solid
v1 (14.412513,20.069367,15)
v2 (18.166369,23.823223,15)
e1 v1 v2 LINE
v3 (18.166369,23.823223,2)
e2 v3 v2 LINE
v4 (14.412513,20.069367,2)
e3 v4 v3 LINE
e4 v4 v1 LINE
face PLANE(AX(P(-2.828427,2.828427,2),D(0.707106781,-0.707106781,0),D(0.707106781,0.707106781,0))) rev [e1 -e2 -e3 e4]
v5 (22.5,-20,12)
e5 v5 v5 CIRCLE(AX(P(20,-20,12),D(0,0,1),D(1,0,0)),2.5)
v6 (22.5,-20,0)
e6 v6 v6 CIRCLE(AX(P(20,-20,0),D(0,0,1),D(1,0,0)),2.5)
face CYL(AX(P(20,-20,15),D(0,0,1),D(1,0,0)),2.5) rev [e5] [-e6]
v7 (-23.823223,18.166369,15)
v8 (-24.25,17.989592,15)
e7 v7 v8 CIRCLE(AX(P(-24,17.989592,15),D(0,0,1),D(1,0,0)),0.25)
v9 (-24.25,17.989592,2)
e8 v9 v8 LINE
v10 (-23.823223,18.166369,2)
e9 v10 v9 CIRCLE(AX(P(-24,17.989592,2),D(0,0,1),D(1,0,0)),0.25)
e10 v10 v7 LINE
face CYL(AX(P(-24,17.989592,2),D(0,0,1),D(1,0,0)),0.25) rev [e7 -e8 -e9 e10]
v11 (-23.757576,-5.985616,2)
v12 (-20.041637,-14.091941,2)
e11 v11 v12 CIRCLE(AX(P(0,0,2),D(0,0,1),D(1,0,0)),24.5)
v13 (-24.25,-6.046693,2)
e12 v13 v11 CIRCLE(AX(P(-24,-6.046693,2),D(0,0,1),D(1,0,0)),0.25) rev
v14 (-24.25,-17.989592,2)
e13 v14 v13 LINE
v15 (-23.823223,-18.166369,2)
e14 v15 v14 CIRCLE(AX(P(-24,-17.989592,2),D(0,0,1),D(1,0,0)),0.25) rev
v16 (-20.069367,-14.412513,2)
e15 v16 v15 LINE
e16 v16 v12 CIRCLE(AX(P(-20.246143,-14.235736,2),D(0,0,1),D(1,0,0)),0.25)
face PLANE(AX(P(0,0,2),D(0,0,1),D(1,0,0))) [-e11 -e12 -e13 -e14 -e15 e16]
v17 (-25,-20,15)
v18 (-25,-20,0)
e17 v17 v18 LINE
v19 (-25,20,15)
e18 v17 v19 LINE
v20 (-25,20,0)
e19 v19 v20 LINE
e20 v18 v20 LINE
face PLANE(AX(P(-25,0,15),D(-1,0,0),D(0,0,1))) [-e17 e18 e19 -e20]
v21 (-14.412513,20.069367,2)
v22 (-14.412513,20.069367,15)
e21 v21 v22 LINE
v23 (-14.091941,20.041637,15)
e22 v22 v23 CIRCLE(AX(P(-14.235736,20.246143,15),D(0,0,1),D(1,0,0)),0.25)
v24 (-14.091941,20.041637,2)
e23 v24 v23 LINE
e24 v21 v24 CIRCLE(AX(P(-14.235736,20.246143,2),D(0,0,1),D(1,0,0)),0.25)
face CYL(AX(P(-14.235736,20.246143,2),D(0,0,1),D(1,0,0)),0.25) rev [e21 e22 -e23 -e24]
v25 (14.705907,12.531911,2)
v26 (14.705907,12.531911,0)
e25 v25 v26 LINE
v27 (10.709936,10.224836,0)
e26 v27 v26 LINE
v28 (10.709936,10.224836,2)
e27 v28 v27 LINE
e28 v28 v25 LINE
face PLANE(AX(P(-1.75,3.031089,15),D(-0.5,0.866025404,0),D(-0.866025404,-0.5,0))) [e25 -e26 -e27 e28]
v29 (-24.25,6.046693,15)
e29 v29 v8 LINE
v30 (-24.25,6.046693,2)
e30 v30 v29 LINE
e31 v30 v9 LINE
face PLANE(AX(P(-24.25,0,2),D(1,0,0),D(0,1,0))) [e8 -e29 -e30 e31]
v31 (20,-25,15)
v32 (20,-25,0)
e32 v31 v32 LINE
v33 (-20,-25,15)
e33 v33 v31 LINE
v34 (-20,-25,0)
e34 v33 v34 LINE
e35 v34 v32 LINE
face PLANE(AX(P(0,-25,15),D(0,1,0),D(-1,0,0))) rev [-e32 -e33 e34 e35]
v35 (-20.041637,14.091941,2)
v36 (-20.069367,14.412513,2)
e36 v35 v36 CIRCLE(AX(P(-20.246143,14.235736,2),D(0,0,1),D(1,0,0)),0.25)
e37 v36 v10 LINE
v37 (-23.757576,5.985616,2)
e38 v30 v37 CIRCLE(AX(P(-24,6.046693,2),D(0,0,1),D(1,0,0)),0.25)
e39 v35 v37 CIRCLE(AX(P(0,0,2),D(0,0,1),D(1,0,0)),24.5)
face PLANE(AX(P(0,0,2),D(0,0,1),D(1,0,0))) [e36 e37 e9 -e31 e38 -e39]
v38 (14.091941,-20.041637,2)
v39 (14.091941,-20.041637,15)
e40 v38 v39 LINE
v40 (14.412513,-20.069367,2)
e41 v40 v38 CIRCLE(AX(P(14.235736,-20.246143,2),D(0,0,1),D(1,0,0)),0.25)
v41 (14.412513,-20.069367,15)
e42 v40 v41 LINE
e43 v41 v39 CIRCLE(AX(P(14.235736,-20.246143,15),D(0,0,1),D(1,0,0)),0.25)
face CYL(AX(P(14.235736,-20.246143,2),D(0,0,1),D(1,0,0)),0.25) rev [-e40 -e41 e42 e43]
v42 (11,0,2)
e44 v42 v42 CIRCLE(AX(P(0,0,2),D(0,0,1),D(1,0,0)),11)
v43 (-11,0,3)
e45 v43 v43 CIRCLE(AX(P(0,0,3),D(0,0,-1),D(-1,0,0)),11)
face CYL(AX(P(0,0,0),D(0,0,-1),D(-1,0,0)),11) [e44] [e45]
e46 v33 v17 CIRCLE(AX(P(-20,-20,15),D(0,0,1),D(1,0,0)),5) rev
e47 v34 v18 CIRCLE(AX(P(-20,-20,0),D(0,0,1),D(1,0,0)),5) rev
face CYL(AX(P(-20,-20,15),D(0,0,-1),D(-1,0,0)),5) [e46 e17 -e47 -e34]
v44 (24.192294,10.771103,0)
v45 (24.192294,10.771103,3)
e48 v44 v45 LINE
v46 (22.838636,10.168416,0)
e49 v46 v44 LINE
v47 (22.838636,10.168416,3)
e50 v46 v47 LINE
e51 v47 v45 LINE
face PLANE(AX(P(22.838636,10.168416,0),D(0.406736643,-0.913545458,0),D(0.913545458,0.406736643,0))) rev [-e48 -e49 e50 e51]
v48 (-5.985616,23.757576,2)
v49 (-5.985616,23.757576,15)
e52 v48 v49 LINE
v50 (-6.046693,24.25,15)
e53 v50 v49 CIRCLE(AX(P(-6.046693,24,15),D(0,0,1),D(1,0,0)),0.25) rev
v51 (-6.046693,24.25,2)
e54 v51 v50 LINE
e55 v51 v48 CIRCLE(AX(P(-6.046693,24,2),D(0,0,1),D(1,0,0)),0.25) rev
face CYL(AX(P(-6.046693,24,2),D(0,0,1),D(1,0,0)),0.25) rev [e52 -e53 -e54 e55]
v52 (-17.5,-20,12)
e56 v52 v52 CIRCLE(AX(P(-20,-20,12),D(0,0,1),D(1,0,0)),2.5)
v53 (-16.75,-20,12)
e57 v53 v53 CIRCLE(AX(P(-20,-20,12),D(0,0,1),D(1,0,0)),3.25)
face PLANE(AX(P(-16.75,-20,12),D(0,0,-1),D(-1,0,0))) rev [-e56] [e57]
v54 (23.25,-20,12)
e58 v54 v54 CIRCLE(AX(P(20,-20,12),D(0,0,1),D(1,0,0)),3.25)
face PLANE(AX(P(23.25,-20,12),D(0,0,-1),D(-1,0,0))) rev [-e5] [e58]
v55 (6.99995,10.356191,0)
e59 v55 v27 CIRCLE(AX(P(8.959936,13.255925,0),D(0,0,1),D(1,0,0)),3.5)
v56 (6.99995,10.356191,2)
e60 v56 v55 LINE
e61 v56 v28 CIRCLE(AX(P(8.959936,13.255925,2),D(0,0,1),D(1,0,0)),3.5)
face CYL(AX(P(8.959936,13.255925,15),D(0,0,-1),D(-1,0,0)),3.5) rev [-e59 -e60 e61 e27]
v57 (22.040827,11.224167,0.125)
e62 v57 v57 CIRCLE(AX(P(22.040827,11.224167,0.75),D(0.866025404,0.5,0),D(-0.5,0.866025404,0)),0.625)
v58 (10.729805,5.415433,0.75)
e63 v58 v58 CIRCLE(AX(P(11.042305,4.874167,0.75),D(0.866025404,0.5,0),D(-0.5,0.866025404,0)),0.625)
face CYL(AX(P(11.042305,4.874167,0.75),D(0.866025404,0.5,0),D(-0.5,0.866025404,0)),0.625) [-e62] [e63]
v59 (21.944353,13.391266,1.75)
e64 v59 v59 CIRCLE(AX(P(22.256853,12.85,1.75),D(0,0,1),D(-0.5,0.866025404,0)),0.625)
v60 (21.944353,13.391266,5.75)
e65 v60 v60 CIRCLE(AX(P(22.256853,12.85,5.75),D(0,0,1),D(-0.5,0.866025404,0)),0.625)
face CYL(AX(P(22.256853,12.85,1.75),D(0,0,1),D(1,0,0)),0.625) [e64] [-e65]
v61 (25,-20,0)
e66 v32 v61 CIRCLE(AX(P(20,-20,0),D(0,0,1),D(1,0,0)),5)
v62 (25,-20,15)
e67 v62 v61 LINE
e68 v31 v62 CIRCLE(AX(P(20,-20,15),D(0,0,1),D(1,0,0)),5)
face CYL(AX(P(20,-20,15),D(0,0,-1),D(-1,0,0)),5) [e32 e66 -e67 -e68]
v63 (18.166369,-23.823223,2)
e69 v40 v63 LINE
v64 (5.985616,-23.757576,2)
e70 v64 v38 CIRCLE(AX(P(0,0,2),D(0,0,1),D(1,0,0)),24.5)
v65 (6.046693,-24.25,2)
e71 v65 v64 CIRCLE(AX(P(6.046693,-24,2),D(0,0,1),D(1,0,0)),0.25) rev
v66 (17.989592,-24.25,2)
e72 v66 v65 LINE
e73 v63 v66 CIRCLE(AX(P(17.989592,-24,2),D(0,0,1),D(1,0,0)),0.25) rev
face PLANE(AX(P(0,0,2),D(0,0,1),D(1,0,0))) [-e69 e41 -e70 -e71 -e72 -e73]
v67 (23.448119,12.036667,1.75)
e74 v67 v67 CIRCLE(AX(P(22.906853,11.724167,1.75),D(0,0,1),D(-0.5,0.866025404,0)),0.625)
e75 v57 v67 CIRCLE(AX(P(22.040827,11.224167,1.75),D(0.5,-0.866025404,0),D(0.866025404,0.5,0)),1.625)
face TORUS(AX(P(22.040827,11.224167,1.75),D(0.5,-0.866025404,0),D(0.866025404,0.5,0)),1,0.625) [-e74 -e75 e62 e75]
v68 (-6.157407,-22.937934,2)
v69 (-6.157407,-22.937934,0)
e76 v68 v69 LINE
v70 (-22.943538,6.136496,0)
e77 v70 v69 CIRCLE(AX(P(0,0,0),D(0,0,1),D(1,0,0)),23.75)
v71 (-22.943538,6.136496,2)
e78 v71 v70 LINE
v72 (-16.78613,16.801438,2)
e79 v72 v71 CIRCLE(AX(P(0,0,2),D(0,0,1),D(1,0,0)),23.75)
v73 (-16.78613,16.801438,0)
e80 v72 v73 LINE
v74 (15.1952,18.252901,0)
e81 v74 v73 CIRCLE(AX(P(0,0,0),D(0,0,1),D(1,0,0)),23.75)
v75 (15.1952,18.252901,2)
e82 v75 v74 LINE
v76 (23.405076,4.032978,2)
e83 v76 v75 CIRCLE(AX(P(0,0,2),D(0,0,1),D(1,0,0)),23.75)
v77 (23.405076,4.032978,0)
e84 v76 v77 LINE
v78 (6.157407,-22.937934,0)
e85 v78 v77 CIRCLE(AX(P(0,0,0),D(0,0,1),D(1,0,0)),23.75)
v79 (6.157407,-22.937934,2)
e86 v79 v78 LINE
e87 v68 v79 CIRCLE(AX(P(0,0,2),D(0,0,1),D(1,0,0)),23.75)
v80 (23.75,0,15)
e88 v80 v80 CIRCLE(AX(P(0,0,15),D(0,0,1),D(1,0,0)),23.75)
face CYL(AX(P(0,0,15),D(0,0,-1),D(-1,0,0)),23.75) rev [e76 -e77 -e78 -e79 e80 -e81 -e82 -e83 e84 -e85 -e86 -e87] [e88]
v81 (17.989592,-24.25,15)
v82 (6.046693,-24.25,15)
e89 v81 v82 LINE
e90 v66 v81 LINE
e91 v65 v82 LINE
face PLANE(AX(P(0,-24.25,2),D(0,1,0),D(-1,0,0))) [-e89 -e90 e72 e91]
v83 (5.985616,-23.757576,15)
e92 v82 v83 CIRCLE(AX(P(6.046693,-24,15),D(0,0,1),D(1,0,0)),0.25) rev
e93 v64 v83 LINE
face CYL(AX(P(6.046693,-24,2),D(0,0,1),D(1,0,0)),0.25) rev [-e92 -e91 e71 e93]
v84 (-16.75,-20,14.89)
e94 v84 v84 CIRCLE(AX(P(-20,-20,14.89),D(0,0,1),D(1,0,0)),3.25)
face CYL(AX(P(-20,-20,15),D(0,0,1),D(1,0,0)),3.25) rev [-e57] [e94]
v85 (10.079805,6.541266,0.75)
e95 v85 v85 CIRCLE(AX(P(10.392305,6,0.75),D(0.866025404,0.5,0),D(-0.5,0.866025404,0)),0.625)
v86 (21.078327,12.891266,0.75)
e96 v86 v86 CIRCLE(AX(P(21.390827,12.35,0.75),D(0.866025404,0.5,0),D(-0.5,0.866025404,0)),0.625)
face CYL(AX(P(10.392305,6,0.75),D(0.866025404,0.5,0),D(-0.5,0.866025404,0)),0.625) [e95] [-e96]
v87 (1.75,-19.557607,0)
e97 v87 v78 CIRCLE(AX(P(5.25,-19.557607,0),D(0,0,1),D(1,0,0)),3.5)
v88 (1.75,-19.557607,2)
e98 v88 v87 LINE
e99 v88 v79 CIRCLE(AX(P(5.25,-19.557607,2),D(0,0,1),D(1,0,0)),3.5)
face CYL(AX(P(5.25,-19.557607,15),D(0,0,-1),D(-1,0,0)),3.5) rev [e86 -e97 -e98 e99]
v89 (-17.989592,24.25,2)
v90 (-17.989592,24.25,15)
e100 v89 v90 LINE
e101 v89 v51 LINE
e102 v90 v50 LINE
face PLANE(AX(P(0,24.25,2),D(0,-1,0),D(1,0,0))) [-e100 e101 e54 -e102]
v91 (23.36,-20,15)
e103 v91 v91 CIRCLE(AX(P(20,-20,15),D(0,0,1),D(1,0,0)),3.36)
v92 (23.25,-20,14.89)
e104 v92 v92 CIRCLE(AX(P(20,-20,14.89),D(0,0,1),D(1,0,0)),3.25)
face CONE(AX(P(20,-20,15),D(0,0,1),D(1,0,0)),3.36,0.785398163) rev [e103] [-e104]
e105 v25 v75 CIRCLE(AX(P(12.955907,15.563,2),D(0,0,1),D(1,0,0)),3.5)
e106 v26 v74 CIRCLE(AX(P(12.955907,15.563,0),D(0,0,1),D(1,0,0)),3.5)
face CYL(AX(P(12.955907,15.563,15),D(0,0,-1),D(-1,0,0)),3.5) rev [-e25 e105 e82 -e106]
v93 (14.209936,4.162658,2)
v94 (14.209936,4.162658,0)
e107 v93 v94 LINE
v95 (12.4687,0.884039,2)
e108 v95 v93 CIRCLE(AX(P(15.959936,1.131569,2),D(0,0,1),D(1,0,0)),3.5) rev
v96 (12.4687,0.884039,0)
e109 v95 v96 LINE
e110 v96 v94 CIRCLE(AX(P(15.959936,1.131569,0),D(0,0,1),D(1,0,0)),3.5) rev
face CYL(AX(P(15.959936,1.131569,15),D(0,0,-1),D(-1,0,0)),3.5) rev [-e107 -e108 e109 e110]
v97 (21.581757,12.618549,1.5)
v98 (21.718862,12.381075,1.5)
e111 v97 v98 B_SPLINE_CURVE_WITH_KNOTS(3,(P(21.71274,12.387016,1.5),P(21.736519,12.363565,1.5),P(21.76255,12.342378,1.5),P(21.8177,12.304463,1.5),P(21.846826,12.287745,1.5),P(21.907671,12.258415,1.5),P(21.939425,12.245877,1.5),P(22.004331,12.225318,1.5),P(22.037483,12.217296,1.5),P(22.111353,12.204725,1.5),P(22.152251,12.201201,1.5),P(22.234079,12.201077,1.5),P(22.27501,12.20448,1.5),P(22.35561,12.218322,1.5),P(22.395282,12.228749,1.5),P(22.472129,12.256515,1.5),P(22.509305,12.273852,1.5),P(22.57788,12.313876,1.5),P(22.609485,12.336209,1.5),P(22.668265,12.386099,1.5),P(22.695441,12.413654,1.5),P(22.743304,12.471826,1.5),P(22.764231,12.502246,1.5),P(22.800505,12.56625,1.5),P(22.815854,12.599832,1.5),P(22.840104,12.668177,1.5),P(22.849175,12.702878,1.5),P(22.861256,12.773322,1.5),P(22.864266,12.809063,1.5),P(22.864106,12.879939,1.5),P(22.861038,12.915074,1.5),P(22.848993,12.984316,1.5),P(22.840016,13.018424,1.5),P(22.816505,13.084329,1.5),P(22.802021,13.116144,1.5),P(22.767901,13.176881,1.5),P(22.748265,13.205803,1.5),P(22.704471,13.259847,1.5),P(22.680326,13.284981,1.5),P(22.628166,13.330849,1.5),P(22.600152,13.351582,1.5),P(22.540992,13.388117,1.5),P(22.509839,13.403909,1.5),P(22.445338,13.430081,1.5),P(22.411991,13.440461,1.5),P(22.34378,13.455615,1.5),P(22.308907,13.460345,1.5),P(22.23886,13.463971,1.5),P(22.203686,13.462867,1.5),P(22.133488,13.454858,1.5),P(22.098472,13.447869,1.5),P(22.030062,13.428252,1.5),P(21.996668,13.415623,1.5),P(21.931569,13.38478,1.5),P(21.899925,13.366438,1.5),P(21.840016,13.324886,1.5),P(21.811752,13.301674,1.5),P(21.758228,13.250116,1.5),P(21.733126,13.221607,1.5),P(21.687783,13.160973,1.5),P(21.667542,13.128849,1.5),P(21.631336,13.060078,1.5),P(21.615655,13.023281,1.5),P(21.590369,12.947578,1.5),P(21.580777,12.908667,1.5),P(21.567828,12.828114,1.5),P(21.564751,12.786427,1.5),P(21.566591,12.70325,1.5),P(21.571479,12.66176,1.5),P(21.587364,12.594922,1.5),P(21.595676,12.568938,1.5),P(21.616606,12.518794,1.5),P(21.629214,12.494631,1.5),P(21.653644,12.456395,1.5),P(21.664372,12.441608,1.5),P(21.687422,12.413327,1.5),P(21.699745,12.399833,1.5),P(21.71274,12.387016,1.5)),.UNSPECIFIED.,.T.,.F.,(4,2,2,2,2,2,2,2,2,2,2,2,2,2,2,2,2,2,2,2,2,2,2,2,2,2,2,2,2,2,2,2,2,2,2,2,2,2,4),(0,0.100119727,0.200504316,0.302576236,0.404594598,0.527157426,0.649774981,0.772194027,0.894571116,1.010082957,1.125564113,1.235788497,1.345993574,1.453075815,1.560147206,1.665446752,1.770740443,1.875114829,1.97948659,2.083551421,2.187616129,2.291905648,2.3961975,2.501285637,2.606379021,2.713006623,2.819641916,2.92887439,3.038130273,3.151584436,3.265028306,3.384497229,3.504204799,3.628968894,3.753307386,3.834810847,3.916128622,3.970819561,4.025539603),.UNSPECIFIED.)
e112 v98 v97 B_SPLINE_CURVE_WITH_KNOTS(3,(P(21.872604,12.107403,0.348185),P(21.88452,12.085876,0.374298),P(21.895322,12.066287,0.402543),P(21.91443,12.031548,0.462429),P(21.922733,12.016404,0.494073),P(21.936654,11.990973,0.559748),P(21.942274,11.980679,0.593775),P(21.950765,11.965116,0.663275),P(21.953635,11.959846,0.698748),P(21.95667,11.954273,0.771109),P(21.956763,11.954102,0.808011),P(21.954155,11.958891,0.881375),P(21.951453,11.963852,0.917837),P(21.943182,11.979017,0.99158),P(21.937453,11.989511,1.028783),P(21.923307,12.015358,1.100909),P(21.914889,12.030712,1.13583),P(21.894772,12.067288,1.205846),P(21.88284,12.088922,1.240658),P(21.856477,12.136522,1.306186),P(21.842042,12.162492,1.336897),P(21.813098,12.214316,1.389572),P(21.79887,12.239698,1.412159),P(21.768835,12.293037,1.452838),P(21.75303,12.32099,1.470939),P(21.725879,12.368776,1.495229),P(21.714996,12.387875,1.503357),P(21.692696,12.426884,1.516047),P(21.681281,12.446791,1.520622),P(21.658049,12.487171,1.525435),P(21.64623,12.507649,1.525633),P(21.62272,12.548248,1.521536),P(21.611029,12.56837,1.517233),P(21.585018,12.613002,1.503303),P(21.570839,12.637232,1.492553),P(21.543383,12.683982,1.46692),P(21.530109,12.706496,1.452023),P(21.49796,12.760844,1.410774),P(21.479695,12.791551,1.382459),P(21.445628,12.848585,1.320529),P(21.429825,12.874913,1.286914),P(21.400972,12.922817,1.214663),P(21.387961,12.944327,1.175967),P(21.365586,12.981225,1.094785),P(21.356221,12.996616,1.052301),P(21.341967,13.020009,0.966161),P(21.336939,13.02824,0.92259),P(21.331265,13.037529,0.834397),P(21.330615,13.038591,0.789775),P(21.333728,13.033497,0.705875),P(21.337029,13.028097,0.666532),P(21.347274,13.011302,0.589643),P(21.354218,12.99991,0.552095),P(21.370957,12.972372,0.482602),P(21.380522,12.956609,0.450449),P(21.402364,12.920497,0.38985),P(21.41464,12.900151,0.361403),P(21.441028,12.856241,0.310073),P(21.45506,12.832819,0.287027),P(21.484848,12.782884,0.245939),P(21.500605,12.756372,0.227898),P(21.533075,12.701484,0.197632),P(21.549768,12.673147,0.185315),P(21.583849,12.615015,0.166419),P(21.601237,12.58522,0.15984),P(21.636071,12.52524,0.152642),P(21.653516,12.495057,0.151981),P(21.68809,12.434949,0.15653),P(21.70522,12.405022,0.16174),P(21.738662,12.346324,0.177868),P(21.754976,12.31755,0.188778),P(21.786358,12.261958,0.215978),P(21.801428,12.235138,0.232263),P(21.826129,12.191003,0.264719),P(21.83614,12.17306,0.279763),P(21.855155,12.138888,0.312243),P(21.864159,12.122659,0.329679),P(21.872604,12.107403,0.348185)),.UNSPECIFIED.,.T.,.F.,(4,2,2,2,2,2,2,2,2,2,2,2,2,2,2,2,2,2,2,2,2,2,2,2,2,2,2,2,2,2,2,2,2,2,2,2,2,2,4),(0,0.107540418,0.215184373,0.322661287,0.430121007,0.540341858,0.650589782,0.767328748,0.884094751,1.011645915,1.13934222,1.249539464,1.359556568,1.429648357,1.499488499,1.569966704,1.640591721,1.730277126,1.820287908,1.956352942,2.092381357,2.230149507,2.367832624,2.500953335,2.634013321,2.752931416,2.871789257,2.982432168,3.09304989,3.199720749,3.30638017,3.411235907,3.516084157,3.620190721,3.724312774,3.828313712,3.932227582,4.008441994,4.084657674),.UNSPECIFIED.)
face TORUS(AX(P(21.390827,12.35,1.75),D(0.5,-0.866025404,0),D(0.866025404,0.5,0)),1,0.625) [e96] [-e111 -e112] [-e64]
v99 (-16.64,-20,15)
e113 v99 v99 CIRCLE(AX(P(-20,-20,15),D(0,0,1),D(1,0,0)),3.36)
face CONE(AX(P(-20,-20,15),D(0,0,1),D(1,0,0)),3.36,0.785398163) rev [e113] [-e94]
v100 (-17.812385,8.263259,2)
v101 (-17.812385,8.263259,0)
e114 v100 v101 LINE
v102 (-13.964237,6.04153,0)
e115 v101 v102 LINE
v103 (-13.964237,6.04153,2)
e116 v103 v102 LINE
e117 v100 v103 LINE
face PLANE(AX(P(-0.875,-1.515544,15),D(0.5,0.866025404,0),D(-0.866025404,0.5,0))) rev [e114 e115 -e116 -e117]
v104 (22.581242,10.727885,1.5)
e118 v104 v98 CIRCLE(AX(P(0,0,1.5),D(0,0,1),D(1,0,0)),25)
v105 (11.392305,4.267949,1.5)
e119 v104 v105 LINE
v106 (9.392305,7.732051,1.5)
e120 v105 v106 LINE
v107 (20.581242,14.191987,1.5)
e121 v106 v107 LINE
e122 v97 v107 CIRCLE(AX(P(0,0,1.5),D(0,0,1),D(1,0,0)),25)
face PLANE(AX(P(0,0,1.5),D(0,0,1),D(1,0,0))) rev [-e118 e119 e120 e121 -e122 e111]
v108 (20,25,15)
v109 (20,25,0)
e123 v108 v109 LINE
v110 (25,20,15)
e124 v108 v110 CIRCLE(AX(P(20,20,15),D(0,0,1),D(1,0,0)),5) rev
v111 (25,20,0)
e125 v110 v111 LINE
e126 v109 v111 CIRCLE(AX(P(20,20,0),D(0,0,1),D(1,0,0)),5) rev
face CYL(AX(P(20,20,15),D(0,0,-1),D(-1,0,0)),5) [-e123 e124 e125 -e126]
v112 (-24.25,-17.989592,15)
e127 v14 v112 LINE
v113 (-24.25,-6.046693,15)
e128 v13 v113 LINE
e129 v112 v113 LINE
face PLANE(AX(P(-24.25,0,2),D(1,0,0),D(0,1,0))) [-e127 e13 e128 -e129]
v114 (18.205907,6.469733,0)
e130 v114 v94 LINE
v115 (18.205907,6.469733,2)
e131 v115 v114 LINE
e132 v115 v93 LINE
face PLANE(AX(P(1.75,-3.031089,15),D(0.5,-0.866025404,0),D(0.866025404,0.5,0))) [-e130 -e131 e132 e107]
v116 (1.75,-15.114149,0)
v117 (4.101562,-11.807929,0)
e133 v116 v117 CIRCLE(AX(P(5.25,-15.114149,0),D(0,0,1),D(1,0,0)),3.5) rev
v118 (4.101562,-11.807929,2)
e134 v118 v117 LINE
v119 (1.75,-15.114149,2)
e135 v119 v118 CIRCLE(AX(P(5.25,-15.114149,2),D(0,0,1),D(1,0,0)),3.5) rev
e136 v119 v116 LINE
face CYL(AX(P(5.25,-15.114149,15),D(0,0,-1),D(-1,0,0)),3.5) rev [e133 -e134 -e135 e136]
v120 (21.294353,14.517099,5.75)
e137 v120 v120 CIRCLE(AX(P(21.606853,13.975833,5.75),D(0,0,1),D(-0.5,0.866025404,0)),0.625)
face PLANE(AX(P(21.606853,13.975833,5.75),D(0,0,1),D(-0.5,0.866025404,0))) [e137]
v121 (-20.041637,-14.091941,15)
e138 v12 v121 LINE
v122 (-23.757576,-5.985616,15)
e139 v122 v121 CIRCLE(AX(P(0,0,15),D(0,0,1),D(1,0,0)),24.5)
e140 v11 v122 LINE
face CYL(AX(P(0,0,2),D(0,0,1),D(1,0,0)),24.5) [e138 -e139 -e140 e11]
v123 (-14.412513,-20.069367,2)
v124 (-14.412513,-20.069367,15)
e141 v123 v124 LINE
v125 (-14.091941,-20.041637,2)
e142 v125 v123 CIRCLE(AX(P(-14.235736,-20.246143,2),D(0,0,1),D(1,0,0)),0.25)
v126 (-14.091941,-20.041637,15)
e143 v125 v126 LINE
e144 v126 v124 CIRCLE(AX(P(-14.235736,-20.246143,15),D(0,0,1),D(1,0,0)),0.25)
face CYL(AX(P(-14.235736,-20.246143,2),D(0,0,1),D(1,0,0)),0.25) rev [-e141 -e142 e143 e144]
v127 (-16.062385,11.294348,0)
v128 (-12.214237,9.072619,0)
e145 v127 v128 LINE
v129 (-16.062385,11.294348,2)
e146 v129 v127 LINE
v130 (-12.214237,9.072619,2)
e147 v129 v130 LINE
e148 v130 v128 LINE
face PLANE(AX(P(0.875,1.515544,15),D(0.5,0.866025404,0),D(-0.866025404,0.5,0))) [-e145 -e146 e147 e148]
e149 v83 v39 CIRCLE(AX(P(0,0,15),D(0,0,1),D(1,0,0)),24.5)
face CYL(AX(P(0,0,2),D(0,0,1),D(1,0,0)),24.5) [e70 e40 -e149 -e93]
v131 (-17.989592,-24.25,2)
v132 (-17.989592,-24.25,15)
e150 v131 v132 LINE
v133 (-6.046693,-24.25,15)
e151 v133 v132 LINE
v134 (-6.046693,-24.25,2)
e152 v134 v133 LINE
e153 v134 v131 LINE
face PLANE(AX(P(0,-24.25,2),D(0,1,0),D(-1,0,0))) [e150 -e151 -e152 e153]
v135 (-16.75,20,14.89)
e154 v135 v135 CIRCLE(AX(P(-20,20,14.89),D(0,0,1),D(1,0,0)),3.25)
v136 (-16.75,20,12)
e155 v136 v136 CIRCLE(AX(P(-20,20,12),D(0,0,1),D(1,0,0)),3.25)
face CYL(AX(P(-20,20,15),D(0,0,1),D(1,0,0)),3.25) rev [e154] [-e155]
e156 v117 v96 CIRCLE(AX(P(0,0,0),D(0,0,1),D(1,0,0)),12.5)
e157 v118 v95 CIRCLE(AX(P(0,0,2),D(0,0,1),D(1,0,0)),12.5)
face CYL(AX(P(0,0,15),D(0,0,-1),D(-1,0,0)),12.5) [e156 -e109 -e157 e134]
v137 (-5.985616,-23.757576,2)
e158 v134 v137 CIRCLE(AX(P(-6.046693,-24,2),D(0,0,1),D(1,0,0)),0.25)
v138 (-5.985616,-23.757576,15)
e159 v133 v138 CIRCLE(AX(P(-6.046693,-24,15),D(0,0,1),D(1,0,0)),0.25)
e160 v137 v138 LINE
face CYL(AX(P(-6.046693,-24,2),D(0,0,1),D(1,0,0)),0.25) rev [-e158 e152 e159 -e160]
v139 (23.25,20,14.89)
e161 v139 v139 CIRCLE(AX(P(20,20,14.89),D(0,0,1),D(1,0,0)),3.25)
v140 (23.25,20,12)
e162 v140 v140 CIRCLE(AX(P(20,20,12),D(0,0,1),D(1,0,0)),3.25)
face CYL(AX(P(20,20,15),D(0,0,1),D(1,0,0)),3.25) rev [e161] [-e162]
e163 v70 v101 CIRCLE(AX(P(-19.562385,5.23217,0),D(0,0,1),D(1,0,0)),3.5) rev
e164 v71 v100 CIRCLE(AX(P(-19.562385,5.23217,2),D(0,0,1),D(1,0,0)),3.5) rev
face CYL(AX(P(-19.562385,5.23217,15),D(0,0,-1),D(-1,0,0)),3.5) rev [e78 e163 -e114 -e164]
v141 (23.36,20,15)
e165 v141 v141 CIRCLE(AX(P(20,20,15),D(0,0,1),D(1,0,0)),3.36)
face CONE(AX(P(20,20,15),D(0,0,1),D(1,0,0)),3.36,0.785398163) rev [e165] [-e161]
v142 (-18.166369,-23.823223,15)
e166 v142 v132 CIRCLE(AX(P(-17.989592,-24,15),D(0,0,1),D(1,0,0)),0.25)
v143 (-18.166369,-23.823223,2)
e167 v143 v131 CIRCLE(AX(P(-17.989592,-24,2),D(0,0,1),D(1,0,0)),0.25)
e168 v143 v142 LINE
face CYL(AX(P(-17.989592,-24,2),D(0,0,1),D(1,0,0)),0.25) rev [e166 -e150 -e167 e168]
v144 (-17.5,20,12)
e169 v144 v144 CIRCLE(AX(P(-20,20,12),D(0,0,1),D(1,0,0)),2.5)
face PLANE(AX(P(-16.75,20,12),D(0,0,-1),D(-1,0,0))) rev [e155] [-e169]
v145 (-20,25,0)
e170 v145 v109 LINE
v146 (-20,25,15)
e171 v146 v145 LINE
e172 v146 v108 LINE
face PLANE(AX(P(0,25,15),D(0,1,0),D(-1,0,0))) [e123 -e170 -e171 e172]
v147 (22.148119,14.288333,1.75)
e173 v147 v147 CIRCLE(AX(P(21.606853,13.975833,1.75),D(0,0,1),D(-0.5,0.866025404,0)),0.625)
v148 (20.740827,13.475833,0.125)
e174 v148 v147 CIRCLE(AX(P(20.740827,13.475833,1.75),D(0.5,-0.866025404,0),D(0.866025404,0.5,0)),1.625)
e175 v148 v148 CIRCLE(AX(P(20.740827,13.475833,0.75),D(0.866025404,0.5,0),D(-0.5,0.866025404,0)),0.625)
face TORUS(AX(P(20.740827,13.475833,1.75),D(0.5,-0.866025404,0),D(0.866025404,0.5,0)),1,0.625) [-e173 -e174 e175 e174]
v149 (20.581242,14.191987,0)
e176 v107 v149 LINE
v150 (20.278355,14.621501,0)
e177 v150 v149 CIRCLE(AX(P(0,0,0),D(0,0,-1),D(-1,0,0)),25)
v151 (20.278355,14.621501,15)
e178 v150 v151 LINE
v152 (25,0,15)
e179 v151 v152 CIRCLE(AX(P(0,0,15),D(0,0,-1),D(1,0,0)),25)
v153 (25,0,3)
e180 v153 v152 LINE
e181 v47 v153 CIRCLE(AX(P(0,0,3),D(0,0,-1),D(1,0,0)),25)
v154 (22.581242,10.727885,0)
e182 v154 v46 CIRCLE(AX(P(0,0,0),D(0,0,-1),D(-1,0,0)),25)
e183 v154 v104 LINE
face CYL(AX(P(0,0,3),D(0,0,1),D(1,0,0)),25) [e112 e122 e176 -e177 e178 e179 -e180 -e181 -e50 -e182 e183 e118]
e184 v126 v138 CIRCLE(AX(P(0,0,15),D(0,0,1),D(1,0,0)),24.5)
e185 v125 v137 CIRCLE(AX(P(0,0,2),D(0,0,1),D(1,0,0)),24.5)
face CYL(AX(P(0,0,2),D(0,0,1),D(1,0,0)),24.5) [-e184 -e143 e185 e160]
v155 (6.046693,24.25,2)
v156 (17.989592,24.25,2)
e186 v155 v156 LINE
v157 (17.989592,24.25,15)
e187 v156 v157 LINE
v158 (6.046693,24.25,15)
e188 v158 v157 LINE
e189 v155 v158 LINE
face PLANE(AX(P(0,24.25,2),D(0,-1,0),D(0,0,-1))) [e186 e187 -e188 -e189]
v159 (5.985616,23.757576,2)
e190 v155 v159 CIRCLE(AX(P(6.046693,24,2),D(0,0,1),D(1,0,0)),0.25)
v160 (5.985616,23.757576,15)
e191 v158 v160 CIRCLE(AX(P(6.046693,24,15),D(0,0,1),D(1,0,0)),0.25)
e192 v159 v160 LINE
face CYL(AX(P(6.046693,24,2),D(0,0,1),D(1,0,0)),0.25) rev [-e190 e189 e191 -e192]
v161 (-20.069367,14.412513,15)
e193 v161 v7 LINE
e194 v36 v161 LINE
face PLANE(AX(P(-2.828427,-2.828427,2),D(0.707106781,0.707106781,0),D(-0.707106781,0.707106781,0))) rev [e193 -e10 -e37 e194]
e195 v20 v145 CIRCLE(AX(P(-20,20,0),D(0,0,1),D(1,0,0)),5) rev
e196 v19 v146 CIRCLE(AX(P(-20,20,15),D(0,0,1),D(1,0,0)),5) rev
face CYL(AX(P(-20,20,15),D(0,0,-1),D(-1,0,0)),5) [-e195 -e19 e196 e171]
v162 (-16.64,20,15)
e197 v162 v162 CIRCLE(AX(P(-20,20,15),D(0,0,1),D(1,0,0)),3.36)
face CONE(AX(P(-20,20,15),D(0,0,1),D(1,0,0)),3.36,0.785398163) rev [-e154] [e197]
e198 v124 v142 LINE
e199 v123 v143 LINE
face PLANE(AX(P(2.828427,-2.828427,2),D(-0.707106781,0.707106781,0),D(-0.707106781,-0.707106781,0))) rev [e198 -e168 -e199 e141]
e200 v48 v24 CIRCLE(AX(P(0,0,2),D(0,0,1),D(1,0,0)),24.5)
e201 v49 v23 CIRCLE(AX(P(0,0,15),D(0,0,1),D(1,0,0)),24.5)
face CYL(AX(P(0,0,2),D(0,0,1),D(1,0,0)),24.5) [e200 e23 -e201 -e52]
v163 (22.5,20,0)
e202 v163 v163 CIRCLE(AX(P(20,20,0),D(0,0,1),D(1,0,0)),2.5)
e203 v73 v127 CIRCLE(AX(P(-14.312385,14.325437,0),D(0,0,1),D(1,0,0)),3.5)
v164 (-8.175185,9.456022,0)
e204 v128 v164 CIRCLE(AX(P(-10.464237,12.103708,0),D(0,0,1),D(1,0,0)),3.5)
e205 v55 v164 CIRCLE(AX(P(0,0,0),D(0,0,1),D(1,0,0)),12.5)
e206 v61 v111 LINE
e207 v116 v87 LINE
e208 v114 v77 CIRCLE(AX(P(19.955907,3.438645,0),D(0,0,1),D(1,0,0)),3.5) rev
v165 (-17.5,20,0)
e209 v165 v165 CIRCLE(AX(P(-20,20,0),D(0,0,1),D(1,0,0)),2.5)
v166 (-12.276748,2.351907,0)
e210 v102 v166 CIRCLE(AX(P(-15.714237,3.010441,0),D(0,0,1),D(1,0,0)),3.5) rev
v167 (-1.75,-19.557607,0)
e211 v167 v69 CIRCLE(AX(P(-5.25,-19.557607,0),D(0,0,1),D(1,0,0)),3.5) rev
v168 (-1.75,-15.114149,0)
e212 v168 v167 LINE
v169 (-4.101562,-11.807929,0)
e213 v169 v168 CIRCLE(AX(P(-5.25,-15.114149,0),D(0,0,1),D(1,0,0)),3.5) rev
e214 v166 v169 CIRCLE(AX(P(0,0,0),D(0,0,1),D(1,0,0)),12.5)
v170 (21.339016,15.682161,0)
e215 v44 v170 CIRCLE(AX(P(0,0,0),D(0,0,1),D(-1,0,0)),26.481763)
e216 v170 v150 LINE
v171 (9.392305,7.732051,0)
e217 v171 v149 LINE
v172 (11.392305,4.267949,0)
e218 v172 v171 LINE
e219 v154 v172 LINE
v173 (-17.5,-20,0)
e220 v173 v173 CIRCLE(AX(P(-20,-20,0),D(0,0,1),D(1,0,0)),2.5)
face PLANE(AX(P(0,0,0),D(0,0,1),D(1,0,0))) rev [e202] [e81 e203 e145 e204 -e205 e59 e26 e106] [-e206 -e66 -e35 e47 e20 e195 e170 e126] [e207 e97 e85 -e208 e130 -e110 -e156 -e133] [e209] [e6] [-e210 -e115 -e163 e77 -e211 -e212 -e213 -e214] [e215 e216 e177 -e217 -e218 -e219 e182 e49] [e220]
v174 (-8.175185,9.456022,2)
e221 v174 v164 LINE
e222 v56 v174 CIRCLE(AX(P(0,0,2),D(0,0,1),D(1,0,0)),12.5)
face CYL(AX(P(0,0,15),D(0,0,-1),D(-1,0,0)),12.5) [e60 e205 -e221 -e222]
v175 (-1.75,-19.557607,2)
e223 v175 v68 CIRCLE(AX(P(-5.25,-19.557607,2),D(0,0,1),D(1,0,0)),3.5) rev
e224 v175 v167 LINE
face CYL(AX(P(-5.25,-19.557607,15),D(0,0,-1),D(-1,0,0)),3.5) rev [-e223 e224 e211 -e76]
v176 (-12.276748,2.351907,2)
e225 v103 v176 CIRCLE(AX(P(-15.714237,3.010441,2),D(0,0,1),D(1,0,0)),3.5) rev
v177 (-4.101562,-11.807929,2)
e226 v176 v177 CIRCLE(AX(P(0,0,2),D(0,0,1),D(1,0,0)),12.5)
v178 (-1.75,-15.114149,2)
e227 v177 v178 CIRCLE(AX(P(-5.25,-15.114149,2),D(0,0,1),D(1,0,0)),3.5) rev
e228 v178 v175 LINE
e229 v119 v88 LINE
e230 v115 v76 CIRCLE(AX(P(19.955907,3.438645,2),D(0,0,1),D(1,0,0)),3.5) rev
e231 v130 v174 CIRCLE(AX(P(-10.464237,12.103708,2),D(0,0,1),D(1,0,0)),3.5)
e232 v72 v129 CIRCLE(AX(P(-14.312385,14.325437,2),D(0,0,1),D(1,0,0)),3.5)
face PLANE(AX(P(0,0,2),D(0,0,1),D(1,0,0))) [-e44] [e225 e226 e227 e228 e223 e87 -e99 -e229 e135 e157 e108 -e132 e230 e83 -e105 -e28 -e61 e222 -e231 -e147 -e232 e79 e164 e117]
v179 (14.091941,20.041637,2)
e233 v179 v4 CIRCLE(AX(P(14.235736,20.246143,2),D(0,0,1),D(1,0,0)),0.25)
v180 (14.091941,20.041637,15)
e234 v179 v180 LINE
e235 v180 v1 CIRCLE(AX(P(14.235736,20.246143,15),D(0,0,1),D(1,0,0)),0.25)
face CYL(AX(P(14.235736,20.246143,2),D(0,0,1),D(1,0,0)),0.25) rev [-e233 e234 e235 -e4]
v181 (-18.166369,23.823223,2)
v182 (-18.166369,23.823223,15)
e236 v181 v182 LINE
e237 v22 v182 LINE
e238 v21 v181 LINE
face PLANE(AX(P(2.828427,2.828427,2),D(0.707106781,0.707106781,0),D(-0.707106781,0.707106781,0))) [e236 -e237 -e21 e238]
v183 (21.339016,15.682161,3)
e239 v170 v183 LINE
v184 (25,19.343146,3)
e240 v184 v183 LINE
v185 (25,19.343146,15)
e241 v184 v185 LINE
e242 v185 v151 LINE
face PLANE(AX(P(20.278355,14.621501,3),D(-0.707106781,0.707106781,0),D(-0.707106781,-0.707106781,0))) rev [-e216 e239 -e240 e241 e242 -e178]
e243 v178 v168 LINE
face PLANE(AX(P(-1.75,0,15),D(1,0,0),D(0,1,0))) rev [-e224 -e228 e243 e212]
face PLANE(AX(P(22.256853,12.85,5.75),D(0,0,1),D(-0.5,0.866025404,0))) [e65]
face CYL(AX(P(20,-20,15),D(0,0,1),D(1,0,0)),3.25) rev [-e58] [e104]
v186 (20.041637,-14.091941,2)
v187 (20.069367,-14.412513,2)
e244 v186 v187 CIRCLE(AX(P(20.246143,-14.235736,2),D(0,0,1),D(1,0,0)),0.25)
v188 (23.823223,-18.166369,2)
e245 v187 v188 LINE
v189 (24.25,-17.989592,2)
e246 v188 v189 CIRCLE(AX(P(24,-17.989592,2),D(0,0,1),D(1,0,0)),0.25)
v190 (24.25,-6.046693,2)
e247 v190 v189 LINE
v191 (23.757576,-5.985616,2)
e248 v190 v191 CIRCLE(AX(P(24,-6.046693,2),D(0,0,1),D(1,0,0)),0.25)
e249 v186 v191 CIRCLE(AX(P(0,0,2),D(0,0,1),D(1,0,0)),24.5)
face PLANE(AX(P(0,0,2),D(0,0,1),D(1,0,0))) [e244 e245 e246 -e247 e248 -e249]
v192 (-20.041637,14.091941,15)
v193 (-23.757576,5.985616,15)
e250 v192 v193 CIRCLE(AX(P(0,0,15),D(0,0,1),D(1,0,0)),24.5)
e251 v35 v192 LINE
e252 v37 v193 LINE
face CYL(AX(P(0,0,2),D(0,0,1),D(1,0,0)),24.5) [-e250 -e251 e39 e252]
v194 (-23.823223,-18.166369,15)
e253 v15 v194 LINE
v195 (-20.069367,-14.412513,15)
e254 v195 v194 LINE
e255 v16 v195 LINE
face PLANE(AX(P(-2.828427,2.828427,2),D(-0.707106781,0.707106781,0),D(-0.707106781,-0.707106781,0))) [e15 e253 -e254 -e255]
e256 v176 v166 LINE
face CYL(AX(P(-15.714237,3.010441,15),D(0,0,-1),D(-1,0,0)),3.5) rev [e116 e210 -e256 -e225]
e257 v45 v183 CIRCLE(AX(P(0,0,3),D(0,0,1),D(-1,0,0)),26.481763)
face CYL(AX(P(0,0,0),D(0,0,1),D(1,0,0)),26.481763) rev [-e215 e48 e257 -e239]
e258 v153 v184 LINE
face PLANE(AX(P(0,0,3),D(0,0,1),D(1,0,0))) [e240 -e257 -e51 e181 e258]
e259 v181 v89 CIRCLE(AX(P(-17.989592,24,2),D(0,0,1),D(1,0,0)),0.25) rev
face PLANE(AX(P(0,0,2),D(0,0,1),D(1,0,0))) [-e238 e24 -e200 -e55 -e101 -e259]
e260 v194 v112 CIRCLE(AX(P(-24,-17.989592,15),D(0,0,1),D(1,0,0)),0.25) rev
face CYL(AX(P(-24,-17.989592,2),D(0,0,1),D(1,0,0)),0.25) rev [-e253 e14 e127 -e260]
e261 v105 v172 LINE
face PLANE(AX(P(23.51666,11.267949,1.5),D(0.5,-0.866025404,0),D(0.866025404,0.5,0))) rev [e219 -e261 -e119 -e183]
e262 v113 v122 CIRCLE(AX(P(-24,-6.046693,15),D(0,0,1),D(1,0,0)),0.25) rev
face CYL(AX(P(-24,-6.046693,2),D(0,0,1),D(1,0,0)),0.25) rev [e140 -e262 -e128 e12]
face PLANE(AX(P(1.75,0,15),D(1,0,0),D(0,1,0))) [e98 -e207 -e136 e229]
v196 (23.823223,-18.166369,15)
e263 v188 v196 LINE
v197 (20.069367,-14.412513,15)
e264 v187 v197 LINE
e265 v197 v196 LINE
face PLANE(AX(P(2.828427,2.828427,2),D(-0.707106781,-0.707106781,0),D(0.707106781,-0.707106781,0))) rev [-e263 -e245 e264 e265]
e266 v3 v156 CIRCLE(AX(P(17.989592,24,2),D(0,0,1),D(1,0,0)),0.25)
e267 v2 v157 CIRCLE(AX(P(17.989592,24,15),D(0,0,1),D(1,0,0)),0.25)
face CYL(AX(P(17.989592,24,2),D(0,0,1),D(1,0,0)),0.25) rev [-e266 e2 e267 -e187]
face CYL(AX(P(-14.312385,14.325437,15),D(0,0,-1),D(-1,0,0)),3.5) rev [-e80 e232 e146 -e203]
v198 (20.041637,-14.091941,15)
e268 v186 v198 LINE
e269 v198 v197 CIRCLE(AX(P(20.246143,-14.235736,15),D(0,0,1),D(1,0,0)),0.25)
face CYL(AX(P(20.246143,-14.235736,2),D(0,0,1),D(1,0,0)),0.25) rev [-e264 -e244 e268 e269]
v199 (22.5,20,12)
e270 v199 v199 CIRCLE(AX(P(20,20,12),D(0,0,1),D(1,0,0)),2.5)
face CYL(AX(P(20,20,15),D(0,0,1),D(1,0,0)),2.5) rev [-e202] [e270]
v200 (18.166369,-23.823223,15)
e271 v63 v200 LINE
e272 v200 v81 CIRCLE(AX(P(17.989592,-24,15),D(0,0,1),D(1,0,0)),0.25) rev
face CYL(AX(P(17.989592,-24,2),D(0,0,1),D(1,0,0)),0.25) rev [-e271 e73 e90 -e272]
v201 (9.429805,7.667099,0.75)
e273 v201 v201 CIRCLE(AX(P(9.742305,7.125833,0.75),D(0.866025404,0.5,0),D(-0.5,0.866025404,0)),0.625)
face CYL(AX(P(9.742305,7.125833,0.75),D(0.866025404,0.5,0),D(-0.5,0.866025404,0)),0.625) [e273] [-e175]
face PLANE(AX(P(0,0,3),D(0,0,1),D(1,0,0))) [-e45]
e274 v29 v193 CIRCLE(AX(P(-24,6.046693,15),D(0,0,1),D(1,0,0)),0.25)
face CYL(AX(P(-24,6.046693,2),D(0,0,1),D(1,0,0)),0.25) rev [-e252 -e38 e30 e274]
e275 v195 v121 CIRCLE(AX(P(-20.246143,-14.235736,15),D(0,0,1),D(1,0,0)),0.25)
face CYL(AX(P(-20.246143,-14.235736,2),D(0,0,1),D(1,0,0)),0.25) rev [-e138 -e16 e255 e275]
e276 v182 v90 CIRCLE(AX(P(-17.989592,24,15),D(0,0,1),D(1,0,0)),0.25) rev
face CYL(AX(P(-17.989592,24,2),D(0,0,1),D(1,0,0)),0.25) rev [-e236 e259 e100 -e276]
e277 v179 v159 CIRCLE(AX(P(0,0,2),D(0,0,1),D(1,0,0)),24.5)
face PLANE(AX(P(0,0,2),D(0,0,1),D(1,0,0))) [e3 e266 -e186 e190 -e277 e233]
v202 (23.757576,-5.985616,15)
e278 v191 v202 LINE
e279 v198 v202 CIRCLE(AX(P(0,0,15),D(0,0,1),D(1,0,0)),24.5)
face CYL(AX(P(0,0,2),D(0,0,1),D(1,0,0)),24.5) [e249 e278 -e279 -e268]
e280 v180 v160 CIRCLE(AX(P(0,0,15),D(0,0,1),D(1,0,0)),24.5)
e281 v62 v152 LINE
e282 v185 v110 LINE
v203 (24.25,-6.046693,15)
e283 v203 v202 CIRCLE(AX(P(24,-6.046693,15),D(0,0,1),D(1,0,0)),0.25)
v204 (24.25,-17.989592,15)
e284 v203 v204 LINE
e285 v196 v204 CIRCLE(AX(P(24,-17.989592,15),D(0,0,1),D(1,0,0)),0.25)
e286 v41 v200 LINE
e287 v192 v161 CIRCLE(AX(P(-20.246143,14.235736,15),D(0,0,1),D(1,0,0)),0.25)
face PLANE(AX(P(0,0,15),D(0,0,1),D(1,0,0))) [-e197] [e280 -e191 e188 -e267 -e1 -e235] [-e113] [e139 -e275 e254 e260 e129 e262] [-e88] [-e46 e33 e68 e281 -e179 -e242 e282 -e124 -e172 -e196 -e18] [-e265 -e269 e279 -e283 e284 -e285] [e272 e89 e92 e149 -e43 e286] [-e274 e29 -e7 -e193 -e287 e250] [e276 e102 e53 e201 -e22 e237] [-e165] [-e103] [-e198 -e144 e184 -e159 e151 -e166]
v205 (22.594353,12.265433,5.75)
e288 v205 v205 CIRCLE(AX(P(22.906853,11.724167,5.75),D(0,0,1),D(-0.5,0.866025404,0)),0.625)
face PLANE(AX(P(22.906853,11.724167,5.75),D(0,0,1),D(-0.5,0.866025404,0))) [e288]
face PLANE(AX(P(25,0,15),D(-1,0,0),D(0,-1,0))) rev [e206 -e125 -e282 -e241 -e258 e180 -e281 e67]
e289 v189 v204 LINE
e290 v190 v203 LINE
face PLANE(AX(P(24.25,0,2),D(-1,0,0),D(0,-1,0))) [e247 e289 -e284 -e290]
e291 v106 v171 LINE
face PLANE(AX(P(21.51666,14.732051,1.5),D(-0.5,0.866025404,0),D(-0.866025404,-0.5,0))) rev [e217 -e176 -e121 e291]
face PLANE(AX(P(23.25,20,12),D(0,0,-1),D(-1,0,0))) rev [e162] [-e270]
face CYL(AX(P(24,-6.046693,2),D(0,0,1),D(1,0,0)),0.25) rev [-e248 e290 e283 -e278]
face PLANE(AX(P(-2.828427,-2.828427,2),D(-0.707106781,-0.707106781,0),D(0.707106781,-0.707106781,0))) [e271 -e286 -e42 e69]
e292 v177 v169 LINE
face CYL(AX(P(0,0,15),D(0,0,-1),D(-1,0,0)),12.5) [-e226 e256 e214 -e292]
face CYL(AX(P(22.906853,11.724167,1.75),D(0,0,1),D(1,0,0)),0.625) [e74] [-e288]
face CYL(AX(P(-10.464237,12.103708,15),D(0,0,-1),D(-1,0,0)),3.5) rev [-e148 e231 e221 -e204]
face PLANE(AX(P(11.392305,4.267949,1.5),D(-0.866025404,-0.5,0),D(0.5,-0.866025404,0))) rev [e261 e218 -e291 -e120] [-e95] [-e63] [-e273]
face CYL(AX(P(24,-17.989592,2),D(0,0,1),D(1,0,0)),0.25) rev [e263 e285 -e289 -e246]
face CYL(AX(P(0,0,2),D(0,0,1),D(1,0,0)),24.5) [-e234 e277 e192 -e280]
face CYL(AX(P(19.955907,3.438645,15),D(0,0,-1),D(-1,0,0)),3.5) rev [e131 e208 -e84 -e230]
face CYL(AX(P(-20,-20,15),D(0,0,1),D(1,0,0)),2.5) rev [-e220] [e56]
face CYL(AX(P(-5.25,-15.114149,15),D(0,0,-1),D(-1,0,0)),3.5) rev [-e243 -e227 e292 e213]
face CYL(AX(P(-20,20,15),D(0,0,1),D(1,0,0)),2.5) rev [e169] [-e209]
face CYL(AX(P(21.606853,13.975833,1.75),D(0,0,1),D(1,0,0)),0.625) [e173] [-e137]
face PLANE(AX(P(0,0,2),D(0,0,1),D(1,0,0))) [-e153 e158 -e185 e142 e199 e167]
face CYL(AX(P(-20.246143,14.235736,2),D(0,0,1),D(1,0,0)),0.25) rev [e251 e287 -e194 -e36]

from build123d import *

# Parameters (mm, degrees)
SKETCH_1_R                 = 23.75
SKETCH_1_R_2               = 12.5
EXTRUDE_1_DEPTH            = 15
CUT_EXTRUDE_1_OUTLINE_W    = 23.75
CUT_EXTRUDE_1_OUTLINE_H    = 13
HOLE_WIZARD_M51_AT_2_COUNT = 2
HOLE_WIZARD_M51_AT_2_PITCH = 40
HOLE_WIZARD_M51_AT_3_COUNT = 2
HOLE_WIZARD_M51_AT_3_PITCH = 56.568542495
HOLE_WIZARD_M51_AT_4_COUNT = 2
HOLE_WIZARD_M51_AT_4_PITCH = 40
CUT_EXTRUDE_2_DEPTH        = 13
SKETCH_7_W                 = 1
SKETCH_7_H                 = 11
CUT_EXTRUDE_3_DEPTH        = 12
CUT_EXTRUDE_4_DEPTH        = 38.336309405
CUT_EXTRUDE_5_DEPTH        = 1.5
SKETCH_12_R                = 0.625
PATTERN_LINEAR_1_COUNT     = 3
PATTERN_LINEAR_1_PITCH     = 1.3


# Read off the part's stored shape, not the designer's step: Вырез-Вытянуть1
with BuildPart() as part:
    # Эскиз1 → Бобышка-Вытянуть1 (new body)
    # profile 1 of 17: a face of its own
    with BuildSketch(Plane.XY):
        with BuildLine():
            ThreePointArc((-25, 20), (-23.535533906, 23.535533906), (-20, 25))
            Line((-20, 25), (20, 25))
            ThreePointArc((20, 25), (23.535533906, 23.535533906), (25, 20))
            Line((25, 20), (25, -20))
            ThreePointArc((25, -20), (23.535533906, -23.535533906), (20, -25))
            Line((20, -25), (-20, -25))
            ThreePointArc((-20, -25), (-23.535533906, -23.535533906), (-25, -20))
            Line((-25, -20), (-25, 20))
        make_face()
        Circle(SKETCH_1_R, mode=Mode.SUBTRACT)
    # profile 2 of 17: a face of its own
    with BuildSketch(Plane.XY):
        with BuildLine():
            ThreePointArc((-16.786130187, 16.801438431), (-18.292852528, 15.147080458), (-19.637191497, 13.358263739))
            Line((-19.637191497, 13.358263739), (-16.062384686, 11.294348064))
            ThreePointArc((-16.062384686, 11.294348064), (-17.782545718, 13.869386093), (-16.786130187, 16.801438431))
        make_face()
    # profile 3 of 17: a face of its own
    with BuildSketch(Plane.XY):
        with BuildLine():
            ThreePointArc((-21.387191497, 10.327174826), (-22.264182733, 8.268534768), (-22.943537595, 6.136495958))
            ThreePointArc((-22.943537595, 6.136495958), (-20.90251355, 8.46544329), (-17.812384686, 8.263259151))
            Line((-17.812384686, 8.263259151), (-21.387191497, 10.327174826))
        make_face()
    # profile 4 of 17: a face of its own
    with BuildSketch(Plane.XY):
        with BuildLine():
            Line((-13.964236991, 6.041530043), (-11.593704446, 4.672902441))
            ThreePointArc((-11.593704446, 4.672902441), (-10.825317547, 6.25), (-9.843704446, 7.703991354))
            Line((-9.843704446, 7.703991354), (-12.214236991, 9.072618957))
            Line((-12.214236991, 9.072618957), (-16.062384686, 11.294348064))
            Line((-16.062384686, 11.294348064), (-19.637191497, 13.358263739))
            ThreePointArc((-19.637191497, 13.358263739), (-20.56810334, 11.875), (-21.387191497, 10.327174826))
            Line((-21.387191497, 10.327174826), (-17.812384686, 8.263259151))
            Line((-17.812384686, 8.263259151), (-13.964236991, 6.041530043))
        make_face()
    # profile 5 of 17: a face of its own
    with BuildSketch(Plane.XY):
        with BuildLine():
            Line((14.705906994, 12.531911246), (18.593533985, 14.776433736))
            ThreePointArc((18.593533985, 14.776433736), (16.983553384, 16.60184973), (15.195199561, 18.252901421))
            ThreePointArc((15.195199561, 18.252901421), (16.443176118, 15.264748492), (14.705906994, 12.531911246))
        make_face()
    # profile 6 of 17: a face of its own
    with BuildSketch(Plane.XY):
        with BuildLine():
            ThreePointArc((6.999949839, 10.356191493), (7.849140534, 9.728360236), (8.642304845, 9.031088913))
            Line((8.642304845, 9.031088913), (10.709935794, 10.224836198))
            ThreePointArc((10.709935794, 10.224836198), (8.836092834, 9.758116809), (6.999949839, 10.356191493))
        make_face()
    # profile 7 of 17: a face of its own
    with BuildSketch(Plane.XY):
        with BuildLine():
            Line((-12.214236991, 9.072618957), (-9.843704446, 7.703991354))
            ThreePointArc((-9.843704446, 7.703991354), (-9.051933396, 8.620469929), (-8.175185149, 9.456021773))
            ThreePointArc((-8.175185149, 9.456021773), (-10.133489879, 8.61937058), (-12.214236991, 9.072618957))
        make_face()
    # profile 8 of 17: a face of its own
    with BuildSketch(Plane.XY):
        with BuildLine():
            ThreePointArc((-13.964236991, 6.041530043), (-12.531338827, 4.466174374), (-12.276747649, 2.351907133))
            ThreePointArc((-12.276747649, 2.351907133), (-11.991512649, 3.52896931), (-11.593704446, 4.672902441))
            Line((-11.593704446, 4.672902441), (-13.964236991, 6.041530043))
        make_face()
    # profile 9 of 17: a face of its own
    with BuildSketch(Plane.XY):
        Circle(SKETCH_1_R_2)
    # profile 10 of 17: a face of its own
    with BuildSketch(Plane.XY):
        with BuildLine():
            ThreePointArc((18.205906994, 6.46973342), (21.441248035, 6.607833991), (23.405076104, 4.032978125))
            ThreePointArc((23.405076104, 4.032978125), (22.869400308, 6.407263812), (22.093533985, 8.714255909))
            Line((22.093533985, 8.714255909), (18.205906994, 6.46973342))
        make_face()
    # profile 11 of 17: a face of its own
    with BuildSketch(Plane.XY):
        with BuildLine():
            ThreePointArc((12.142304845, 2.968911087), (12.349577368, 1.933374982), (12.468699839, 0.884038639))
            ThreePointArc((12.468699839, 0.884038639), (12.868823467, 2.77322246), (14.209935794, 4.162658372))
            Line((14.209935794, 4.162658372), (12.142304845, 2.968911087))
        make_face()
    # profile 12 of 17: a face of its own
    with BuildSketch(Plane.XY):
        with BuildLine():
            ThreePointArc((8.642304845, 9.031088913), (10.825317547, 6.25), (12.142304845, 2.968911087))
            Line((12.142304845, 2.968911087), (14.209935794, 4.162658372))
            Line((14.209935794, 4.162658372), (18.205906994, 6.46973342))
            Line((18.205906994, 6.46973342), (22.093533985, 8.714255909))
            ThreePointArc((22.093533985, 8.714255909), (20.56810334, 11.875), (18.593533985, 14.776433736))
            Line((18.593533985, 14.776433736), (14.705906994, 12.531911246))
            Line((14.705906994, 12.531911246), (10.709935794, 10.224836198))
            Line((10.709935794, 10.224836198), (8.642304845, 9.031088913))
        make_face()
    # profile 13 of 17: a face of its own
    with BuildSketch(Plane.XY):
        with BuildLine():
            Line((1.75, -15.114149), (1.75, -12.376893794))
            ThreePointArc((1.75, -12.376893794), (0, -12.5), (-1.75, -12.376893794))
            Line((-1.75, -12.376893794), (-1.75, -15.114149))
            Line((-1.75, -15.114149), (-1.75, -19.557607216))
            Line((-1.75, -19.557607216), (-1.75, -23.685438565))
            ThreePointArc((-1.75, -23.685438565), (0, -23.75), (1.75, -23.685438565))
            Line((1.75, -23.685438565), (1.75, -19.557607216))
            Line((1.75, -19.557607216), (1.75, -15.114149))
        make_face()
    # profile 14 of 17: a face of its own
    with BuildSketch(Plane.XY):
        with BuildLine():
            ThreePointArc((4.1015625, -11.807928906), (2.939579253, -12.149439239), (1.75, -12.376893794))
            Line((1.75, -12.376893794), (1.75, -15.114149))
            ThreePointArc((1.75, -15.114149), (2.397848948, -13.085544954), (4.1015625, -11.807928906))
        make_face()
    # profile 15 of 17: a face of its own
    with BuildSketch(Plane.XY):
        with BuildLine():
            Line((-1.75, -15.114149), (-1.75, -12.376893794))
            ThreePointArc((-1.75, -12.376893794), (-2.939579253, -12.149439239), (-4.1015625, -11.807928906))
            ThreePointArc((-4.1015625, -11.807928906), (-2.397848948, -13.085544954), (-1.75, -15.114149))
        make_face()
    # profile 16 of 17: a face of its own
    with BuildSketch(Plane.XY):
        with BuildLine():
            Line((-1.75, -23.685438565), (-1.75, -19.557607216))
            ThreePointArc((-1.75, -19.557607216), (-3.119967832, -22.334829382), (-6.157407407, -22.937934389))
            ThreePointArc((-6.157407407, -22.937934389), (-3.971330205, -23.415615226), (-1.75, -23.685438565))
        make_face()
    # profile 17 of 17: a face of its own
    with BuildSketch(Plane.XY):
        with BuildLine():
            ThreePointArc((6.157407407, -22.937934389), (3.119967832, -22.334829382), (1.75, -19.557607216))
            Line((1.75, -19.557607216), (1.75, -23.685438565))
            ThreePointArc((1.75, -23.685438565), (3.971330205, -23.415615226), (6.157407407, -22.937934389))
        make_face()
    extrude(amount=EXTRUDE_1_DEPTH)

    # Вырез-Вытянуть1 outline → Вырез-Вытянуть1 (revolve, cut)
    with BuildSketch(Plane.XZ):
        with Locations((11.875, 8.5)):
            Rectangle(CUT_EXTRUDE_1_OUTLINE_W, CUT_EXTRUDE_1_OUTLINE_H)
    revolve(axis=Axis((0, 0, 0), (0, 0, 1)), mode=Mode.SUBTRACT)

    # Эскиз5 → Цековка для  болта с шестигранной головкой M51 (revolve, cut)
    with BuildSketch(Plane(origin=(-20, 20, 15), x_dir=(0, -1, 0), z_dir=(1, 0, 0))):
        Polygon((0, 0), (0, 15), (2.5, 15), (2.5, 3), (3.25, 3), (3.25, 0.11), (3.36, 0), align=None)
    hole_wizard_m51 = revolve(axis=Axis((-20, 20, 21.35), (0, 0, -1)), mode=Mode.SUBTRACT)

    # Цековка для  болта с шестигранной головкой M51 at 2: Цековка для  болта с шестигранной головкой M51 ×2
    with Locations(*[(i * HOLE_WIZARD_M51_AT_2_PITCH, 0, 0) for i in range(1, HOLE_WIZARD_M51_AT_2_COUNT)]):
        add(hole_wizard_m51, mode=Mode.SUBTRACT)

    # Цековка для  болта с шестигранной головкой M51 at 3: Цековка для  болта с шестигранной головкой M51 ×2
    with Locations(*[Vector(0.7071067811865476, -0.7071067811865475, 0) * (i * HOLE_WIZARD_M51_AT_3_PITCH) for i in range(1, HOLE_WIZARD_M51_AT_3_COUNT)]):
        add(hole_wizard_m51, mode=Mode.SUBTRACT)

    # Цековка для  болта с шестигранной головкой M51 at 4: Цековка для  болта с шестигранной головкой M51 ×2
    with Locations(*[(0, -i * HOLE_WIZARD_M51_AT_4_PITCH, 0) for i in range(1, HOLE_WIZARD_M51_AT_4_COUNT)]):
        add(hole_wizard_m51, mode=Mode.SUBTRACT)

    # Эскиз6 → Вырез-Вытянуть2 (cut)
    with BuildSketch(Plane.XY.offset(15)):
        with BuildLine():
            ThreePointArc((14.091940518, 20.04163697), (10.209266144, 22.271526324), (5.985615601, 23.757575758))
            ThreePointArc((5.985615601, 23.757575758), (5.798594479, 24.030772873), (6.046693311, 24.25))
            Line((6.046693311, 24.25), (17.98959236, 24.25))
            ThreePointArc((17.98959236, 24.25), (18.220562243, 24.095670858), (18.166369055, 23.823223305))
            Line((18.166369055, 23.823223305), (14.412512525, 20.069366774))
            ThreePointArc((14.412512525, 20.069366774), (14.25728063, 19.997073557), (14.091940518, 20.04163697))
        make_face()
        with BuildLine():
            Line((-14.412512525, 20.069366774), (-18.166369055, 23.823223305))
            ThreePointArc((-18.166369055, 23.823223305), (-18.220562243, 24.095670858), (-17.98959236, 24.25))
            Line((-17.98959236, 24.25), (-6.046693311, 24.25))
            ThreePointArc((-6.046693311, 24.25), (-5.798594479, 24.030772873), (-5.985615601, 23.757575758))
            ThreePointArc((-5.985615601, 23.757575758), (-10.209266144, 22.271526324), (-14.091940518, 20.04163697))
            ThreePointArc((-14.091940518, 20.04163697), (-14.25728063, 19.997073557), (-14.412512525, 20.069366774))
        make_face()
        with BuildLine():
            ThreePointArc((-20.04163697, 14.091940518), (-22.271526324, 10.209266144), (-23.757575758, 5.985615601))
            ThreePointArc((-23.757575758, 5.985615601), (-24.030772873, 5.798594479), (-24.25, 6.046693311))
            Line((-24.25, 6.046693311), (-24.25, 17.98959236))
            ThreePointArc((-24.25, 17.98959236), (-24.095670858, 18.220562243), (-23.823223305, 18.166369055))
            Line((-23.823223305, 18.166369055), (-20.069366774, 14.412512525))
            ThreePointArc((-20.069366774, 14.412512525), (-19.997073557, 14.25728063), (-20.04163697, 14.091940518))
        make_face()
        with BuildLine():
            Line((-20.069366774, -14.412512525), (-23.823223305, -18.166369055))
            ThreePointArc((-23.823223305, -18.166369055), (-24.095670858, -18.220562243), (-24.25, -17.98959236))
            Line((-24.25, -17.98959236), (-24.25, -6.046693311))
            ThreePointArc((-24.25, -6.046693311), (-24.030772873, -5.798594479), (-23.757575758, -5.985615601))
            ThreePointArc((-23.757575758, -5.985615601), (-22.271526324, -10.209266144), (-20.04163697, -14.091940518))
            ThreePointArc((-20.04163697, -14.091940518), (-19.997073557, -14.25728063), (-20.069366774, -14.412512525))
        make_face()
        with BuildLine():
            ThreePointArc((-14.091940518, -20.04163697), (-10.209266144, -22.271526324), (-5.985615601, -23.757575758))
            ThreePointArc((-5.985615601, -23.757575758), (-5.798594479, -24.030772873), (-6.046693311, -24.25))
            Line((-6.046693311, -24.25), (-17.98959236, -24.25))
            ThreePointArc((-17.98959236, -24.25), (-18.220562243, -24.095670858), (-18.166369055, -23.823223305))
            Line((-18.166369055, -23.823223305), (-14.412512525, -20.069366774))
            ThreePointArc((-14.412512525, -20.069366774), (-14.25728063, -19.997073557), (-14.091940518, -20.04163697))
        make_face()
        with BuildLine():
            Line((14.412512525, -20.069366774), (18.166369055, -23.823223305))
            ThreePointArc((18.166369055, -23.823223305), (18.220562243, -24.095670858), (17.98959236, -24.25))
            Line((17.98959236, -24.25), (6.046693311, -24.25))
            ThreePointArc((6.046693311, -24.25), (5.798594479, -24.030772873), (5.985615601, -23.757575758))
            ThreePointArc((5.985615601, -23.757575758), (10.209266144, -22.271526324), (14.091940518, -20.04163697))
            ThreePointArc((14.091940518, -20.04163697), (14.25728063, -19.997073557), (14.412512525, -20.069366774))
        make_face()
        with BuildLine():
            ThreePointArc((20.04163697, -14.091940518), (22.271526324, -10.209266144), (23.757575758, -5.985615601))
            ThreePointArc((23.757575758, -5.985615601), (24.030772873, -5.798594479), (24.25, -6.046693311))
            Line((24.25, -6.046693311), (24.25, -17.98959236))
            ThreePointArc((24.25, -17.98959236), (24.095670858, -18.220562243), (23.823223305, -18.166369055))
            Line((23.823223305, -18.166369055), (20.069366774, -14.412512525))
            ThreePointArc((20.069366774, -14.412512525), (19.997073557, -14.25728063), (20.04163697, -14.091940518))
        make_face()
    extrude(amount=-CUT_EXTRUDE_2_DEPTH, mode=Mode.SUBTRACT)

    # Эскиз7 → Повернуть1 (revolve)
    with BuildSketch(Plane(origin=(0, 0, 0), x_dir=(0, 0, -1), z_dir=(1, 0, 0)), mode=Mode.PRIVATE) as revolve_1_sk:
        with Locations((-2.5, 5.5)):
            Rectangle(SKETCH_7_W, SKETCH_7_H)
    revolve(revolve_1_sk.sketch.rotate(Axis((0, 0, 0), (0, 0, 1)), 75.026113759), axis=Axis((0, 0, 0), (0, 0, 1)))

    # Эскиз8 → Вырез-Вытянуть3 (cut)
    with BuildSketch(Plane.XY.offset(15)):
        with BuildLine():
            Line((20.278355491, 14.621501242), (25, 19.343145751))
            Line((25, 19.343145751), (25, 0))
            ThreePointArc((25, 0), (23.790322479, 7.682483736), (20.278355491, 14.621501242))
        make_face()
    extrude(amount=-CUT_EXTRUDE_3_DEPTH, mode=Mode.SUBTRACT)

    # Эскиз9 → Вырез-Вытянуть4 (cut, through all)
    with BuildSketch(Plane.XY.offset(3)):
        with BuildLine():
            Line((20.278355491, 14.621501242), (21.339015663, 15.682161414))
            ThreePointArc((21.339015663, 15.682161414), (22.897700128, 13.303349388), (24.192294376, 10.77110342))
            Line((24.192294376, 10.77110342), (22.838636441, 10.168416077))
            ThreePointArc((22.838636441, 10.168416077), (21.67316867, 12.460889206), (20.278355491, 14.621501242))
        make_face()
    extrude(amount=-CUT_EXTRUDE_4_DEPTH, mode=Mode.SUBTRACT)

    # Эскиз10 → Вырез-Вытянуть5 (cut)
    with BuildSketch(Plane(origin=(0, 0, 0), x_dir=(-1, 0, 0), z_dir=(0, 0, -1))):
        Polygon((-21.516660498, 14.732050808), (-9.392304845, 7.732050808), (-11.392304845, 4.267949192), (-23.516660498, 11.267949192), align=None)
    extrude(amount=-CUT_EXTRUDE_5_DEPTH, mode=Mode.SUBTRACT)

    # По траектории1: sweep along a path in Эскиз11
    with BuildLine(Plane(origin=(0.65, -1.125833025, 0), x_dir=(0.86602540378444, 0.4999999999999977, 0), z_dir=(-0.4999999999999977, 0.86602540378444, 0))) as sweep_1_path:
        Line((12, -0.75), (24.7, -0.75))
        ThreePointArc((24.7, -0.75), (25.407106781, -1.042893219), (25.7, -1.75))
        Line((25.7, -1.75), (25.7, -5.75))
    # Эскиз12 → По траектории1 (sweep)
    with BuildSketch(Plane(origin=(10.392304845, 6, 0), x_dir=(0, 0, -1), z_dir=(0.8660254037844394, 0.4999999999999989, 0))):
        with Locations((-0.75, -1.3)):
            Circle(SKETCH_12_R)
    sweep_1 = sweep(path=sweep_1_path.line)

    # Линейный массив1: По траектории1 ×3
    with Locations(*[Vector(-0.49999999999999856, 0.8660254037844395, 0) * (i * PATTERN_LINEAR_1_PITCH) for i in range(1, PATTERN_LINEAR_1_COUNT)]):
        add(sweep_1)


solid = part.part
